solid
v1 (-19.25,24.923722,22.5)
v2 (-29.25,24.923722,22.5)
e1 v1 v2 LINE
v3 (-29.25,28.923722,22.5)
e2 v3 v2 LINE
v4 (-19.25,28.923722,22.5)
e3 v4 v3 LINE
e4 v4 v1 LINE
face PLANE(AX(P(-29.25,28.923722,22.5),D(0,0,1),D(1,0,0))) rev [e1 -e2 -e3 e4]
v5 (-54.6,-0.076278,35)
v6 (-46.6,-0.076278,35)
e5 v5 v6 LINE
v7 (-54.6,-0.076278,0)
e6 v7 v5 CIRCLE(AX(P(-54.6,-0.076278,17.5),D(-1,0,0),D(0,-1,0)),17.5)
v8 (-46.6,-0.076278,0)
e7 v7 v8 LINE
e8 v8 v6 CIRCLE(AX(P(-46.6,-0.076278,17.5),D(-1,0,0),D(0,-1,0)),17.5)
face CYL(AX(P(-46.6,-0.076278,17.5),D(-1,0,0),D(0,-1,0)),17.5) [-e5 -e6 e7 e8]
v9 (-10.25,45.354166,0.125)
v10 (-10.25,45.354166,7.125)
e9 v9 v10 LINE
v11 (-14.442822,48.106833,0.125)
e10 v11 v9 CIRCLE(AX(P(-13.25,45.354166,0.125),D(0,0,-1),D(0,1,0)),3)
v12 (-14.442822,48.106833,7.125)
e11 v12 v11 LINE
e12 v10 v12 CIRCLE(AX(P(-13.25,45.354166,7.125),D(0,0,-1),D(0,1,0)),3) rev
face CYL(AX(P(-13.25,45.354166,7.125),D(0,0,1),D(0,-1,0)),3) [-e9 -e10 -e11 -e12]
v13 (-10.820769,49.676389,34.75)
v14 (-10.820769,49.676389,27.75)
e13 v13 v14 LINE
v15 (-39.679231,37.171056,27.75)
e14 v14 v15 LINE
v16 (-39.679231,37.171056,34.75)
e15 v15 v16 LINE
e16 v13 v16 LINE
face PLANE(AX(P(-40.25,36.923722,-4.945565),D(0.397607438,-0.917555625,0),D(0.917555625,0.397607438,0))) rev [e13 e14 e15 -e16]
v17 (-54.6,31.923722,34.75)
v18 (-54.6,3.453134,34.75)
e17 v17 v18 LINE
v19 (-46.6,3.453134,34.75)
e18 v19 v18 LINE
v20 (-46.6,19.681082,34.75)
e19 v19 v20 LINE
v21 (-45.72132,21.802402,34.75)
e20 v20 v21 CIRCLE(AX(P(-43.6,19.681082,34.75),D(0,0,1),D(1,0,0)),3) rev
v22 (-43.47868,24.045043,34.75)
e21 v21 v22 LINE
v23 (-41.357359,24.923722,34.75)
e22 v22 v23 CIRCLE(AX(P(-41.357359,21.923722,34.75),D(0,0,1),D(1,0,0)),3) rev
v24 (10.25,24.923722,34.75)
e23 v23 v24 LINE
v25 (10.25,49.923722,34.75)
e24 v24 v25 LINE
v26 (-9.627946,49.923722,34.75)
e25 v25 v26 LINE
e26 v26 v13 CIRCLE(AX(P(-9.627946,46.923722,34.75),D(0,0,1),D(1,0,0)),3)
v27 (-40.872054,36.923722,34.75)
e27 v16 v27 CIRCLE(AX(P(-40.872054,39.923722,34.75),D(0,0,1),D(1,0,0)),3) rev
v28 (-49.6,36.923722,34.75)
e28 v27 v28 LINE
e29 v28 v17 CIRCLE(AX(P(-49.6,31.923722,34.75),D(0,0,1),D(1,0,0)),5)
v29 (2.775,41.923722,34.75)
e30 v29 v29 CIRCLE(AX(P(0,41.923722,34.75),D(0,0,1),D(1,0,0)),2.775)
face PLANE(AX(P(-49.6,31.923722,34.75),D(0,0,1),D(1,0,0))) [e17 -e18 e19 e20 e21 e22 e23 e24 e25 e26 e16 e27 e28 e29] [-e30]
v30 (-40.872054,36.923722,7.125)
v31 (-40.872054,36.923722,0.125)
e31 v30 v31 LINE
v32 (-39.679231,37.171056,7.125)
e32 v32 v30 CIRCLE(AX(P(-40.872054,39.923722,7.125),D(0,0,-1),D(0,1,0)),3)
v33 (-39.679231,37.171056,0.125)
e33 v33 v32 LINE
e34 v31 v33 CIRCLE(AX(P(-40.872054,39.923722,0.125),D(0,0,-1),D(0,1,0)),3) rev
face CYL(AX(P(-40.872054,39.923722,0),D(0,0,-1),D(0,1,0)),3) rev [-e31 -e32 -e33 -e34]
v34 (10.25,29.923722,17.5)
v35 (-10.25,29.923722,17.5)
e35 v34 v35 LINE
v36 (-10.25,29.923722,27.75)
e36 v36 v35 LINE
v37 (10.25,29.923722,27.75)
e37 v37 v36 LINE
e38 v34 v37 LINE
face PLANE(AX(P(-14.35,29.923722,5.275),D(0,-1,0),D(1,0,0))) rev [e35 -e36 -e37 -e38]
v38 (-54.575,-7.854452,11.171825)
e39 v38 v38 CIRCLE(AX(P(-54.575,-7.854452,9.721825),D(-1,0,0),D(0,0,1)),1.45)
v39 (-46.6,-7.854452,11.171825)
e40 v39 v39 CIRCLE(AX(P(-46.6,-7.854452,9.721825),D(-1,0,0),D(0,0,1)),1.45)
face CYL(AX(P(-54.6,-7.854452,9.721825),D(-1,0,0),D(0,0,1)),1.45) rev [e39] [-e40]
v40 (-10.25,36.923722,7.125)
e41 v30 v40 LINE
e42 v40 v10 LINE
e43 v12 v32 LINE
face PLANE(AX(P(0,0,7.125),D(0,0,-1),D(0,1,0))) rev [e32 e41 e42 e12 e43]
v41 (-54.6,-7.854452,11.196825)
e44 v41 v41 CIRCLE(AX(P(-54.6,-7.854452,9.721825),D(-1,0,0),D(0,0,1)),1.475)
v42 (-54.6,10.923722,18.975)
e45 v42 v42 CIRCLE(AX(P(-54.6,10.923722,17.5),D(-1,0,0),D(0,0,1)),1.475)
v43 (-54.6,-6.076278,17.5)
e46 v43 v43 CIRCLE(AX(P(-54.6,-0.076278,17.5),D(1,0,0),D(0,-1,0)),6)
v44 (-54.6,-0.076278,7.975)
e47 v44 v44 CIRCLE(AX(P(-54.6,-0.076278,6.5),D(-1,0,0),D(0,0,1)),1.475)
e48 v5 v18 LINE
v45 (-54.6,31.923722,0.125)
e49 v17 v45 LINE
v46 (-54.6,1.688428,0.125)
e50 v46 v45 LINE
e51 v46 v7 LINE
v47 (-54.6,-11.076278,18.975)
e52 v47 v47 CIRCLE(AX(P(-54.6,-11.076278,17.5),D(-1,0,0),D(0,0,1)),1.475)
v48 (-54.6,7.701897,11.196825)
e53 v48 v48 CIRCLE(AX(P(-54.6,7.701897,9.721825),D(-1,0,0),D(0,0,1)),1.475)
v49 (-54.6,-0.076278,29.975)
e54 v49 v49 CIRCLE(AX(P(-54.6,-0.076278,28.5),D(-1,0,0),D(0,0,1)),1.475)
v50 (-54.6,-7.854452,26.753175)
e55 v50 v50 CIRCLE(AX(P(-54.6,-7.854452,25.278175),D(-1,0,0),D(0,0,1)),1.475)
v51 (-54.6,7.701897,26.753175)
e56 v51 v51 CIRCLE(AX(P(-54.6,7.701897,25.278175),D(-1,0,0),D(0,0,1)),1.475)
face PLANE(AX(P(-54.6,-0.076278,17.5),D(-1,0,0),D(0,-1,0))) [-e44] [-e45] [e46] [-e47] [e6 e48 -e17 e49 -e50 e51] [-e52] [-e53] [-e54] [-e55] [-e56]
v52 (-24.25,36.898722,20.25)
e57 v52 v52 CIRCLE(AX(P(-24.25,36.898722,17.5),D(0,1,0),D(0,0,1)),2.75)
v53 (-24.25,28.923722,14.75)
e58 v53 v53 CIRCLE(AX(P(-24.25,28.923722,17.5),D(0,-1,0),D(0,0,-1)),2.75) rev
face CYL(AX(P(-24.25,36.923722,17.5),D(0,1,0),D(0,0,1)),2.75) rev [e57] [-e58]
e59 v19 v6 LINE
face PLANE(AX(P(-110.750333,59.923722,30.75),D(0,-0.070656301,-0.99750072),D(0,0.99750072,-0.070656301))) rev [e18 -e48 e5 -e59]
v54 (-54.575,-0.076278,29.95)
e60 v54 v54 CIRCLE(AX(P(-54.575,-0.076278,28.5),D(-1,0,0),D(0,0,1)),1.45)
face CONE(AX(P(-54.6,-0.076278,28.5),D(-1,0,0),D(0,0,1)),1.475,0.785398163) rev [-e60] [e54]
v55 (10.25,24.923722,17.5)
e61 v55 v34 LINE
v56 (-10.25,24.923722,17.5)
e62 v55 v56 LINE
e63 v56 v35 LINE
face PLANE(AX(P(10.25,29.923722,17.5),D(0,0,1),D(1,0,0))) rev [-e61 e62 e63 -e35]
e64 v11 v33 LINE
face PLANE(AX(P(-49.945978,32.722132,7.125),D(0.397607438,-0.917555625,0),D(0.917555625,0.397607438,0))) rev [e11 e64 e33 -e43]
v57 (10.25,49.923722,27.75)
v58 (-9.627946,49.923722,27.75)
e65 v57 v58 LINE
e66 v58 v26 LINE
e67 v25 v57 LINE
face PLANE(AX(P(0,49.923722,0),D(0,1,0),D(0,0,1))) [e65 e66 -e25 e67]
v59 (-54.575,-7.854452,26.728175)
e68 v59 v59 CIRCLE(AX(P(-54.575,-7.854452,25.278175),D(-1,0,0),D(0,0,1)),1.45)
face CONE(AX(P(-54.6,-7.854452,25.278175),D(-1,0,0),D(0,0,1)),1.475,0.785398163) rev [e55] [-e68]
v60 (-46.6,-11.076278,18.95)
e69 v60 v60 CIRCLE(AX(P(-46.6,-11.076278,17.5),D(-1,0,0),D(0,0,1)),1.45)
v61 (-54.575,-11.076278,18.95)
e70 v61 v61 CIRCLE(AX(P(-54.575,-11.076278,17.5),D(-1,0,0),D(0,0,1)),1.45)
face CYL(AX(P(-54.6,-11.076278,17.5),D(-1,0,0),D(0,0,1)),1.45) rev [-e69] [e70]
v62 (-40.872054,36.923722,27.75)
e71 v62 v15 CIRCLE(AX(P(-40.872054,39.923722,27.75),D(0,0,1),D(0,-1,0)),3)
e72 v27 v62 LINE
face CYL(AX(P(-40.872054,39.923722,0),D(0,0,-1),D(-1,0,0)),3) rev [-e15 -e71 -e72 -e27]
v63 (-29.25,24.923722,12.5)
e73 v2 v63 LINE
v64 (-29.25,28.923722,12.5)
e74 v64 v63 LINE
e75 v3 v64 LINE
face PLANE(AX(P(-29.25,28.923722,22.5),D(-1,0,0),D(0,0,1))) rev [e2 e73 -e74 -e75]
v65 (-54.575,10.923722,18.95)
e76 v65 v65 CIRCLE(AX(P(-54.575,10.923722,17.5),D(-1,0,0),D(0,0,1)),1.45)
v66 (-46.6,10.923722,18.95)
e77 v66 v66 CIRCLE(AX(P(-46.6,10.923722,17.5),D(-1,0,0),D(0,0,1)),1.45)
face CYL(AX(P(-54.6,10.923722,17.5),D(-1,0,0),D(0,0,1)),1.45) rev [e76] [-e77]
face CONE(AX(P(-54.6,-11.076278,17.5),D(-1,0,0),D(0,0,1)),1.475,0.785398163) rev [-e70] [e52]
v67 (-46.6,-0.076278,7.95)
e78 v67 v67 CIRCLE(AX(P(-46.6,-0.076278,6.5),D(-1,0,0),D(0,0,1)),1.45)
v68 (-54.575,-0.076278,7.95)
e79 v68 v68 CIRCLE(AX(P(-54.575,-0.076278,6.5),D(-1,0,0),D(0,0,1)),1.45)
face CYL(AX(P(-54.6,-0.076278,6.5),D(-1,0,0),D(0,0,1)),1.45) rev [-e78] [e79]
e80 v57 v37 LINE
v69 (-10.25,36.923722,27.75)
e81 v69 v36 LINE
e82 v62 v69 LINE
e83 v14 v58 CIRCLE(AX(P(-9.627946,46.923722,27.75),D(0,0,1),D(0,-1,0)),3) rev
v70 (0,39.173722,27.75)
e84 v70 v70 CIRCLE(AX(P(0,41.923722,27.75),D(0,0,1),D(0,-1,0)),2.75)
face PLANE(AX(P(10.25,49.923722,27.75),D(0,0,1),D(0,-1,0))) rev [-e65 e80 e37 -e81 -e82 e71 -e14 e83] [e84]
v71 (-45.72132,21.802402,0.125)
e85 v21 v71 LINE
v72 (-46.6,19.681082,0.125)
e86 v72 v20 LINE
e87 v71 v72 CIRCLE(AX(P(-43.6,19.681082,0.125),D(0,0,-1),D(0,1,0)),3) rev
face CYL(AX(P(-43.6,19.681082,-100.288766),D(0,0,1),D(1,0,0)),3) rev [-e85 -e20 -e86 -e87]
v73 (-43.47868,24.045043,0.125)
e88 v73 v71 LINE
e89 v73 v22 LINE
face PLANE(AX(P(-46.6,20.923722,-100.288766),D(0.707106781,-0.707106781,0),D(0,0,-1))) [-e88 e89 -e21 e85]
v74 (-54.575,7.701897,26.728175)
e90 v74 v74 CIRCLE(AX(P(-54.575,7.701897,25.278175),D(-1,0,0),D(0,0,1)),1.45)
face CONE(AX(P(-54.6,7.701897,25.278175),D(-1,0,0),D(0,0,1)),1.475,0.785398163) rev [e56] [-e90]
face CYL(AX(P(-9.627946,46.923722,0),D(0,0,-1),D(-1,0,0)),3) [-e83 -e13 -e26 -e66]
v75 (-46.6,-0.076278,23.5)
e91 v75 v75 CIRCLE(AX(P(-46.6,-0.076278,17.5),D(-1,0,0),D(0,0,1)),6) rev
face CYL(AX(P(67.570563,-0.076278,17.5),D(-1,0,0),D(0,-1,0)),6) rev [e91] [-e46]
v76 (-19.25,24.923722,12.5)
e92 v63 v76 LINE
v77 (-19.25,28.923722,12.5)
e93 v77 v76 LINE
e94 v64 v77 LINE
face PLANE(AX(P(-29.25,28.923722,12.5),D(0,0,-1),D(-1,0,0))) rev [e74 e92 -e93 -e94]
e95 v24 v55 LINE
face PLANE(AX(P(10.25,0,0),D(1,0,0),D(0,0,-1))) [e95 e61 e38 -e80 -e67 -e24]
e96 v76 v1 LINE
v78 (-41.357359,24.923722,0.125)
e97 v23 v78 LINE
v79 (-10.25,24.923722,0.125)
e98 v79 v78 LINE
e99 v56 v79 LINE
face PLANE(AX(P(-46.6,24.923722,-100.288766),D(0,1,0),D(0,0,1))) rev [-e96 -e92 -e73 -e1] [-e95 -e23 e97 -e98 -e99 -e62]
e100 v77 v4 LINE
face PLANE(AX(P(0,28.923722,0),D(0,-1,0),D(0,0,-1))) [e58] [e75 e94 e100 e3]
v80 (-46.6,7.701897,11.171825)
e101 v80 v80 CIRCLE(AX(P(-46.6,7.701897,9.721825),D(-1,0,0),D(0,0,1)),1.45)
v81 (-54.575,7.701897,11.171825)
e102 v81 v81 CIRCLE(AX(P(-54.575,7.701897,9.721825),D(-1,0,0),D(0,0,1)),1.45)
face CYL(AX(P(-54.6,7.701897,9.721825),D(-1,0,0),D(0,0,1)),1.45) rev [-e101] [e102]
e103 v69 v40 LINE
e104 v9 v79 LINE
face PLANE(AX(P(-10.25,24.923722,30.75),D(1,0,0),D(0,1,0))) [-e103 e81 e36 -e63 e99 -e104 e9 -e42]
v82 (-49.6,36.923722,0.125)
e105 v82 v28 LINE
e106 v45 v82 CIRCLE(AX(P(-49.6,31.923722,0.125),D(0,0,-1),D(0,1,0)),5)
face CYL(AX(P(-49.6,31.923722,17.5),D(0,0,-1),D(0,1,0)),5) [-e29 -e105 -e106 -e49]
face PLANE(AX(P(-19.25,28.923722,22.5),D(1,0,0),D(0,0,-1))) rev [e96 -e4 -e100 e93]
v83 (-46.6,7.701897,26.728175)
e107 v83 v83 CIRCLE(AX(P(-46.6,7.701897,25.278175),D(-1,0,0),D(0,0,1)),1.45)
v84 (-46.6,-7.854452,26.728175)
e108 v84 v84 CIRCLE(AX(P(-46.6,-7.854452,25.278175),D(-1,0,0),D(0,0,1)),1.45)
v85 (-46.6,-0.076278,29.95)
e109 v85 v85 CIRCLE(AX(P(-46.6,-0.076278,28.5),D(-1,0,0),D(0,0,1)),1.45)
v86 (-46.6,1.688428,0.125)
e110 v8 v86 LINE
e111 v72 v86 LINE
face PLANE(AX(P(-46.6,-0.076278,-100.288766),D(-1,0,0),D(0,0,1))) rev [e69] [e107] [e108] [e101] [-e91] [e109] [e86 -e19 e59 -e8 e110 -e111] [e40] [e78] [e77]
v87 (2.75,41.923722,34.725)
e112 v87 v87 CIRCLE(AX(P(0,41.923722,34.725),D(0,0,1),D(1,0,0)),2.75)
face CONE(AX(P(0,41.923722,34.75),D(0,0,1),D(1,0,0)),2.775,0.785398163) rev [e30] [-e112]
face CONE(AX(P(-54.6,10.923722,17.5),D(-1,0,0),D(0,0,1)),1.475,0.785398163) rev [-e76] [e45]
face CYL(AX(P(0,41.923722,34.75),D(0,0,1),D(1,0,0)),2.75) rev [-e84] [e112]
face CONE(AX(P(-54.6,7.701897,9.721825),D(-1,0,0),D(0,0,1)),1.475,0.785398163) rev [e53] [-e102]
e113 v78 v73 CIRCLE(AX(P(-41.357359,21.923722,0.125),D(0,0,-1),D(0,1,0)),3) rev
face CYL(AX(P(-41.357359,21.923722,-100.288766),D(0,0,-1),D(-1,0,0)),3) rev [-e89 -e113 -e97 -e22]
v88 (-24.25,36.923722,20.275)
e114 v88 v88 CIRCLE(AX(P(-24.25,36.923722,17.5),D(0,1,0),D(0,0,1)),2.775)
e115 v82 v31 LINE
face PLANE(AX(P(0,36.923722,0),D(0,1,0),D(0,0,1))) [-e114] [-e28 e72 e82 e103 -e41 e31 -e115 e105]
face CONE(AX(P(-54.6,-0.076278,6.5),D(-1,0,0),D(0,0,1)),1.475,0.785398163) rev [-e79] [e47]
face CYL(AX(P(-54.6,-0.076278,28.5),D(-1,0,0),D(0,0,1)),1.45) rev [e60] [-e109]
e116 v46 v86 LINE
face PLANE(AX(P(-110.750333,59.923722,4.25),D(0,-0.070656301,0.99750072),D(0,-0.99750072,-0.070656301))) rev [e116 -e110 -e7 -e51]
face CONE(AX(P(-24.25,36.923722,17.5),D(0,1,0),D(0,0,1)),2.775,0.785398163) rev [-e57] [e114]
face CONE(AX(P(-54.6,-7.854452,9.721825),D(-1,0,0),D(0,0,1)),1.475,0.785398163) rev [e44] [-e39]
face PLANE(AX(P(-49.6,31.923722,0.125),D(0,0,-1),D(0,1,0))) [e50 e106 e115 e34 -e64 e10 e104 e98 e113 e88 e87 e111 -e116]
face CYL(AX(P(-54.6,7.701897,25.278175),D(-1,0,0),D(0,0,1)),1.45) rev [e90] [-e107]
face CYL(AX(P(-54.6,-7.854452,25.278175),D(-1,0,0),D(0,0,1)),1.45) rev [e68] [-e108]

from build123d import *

# Parameters (mm, degrees)
EXTRUDE_1_DEPTH                = 35
SKETCH_6_R                     = 6
CUT_EXTRUDE_2_DEPTH            = 101.2
SKETCH_7_R                     = 5.75
EXTRUDE_3_DEPTH                = 101.2
CUT_EXTRUDE_3_REACH            = 87.885
SKETCH_16_W                    = 20.2
SKETCH_16_H                    = 20.2
CUT_EXTRUDE_5_DEPTH            = 30
SKETCH_15_W                    = 20.5
SKETCH_15_H                    = 35
CUT_EXTRUDE_6_DEPTH            = 4.25
SKETCH_17_W                    = 20.5
SKETCH_17_H                    = 35
CUT_EXTRUDE_7_DEPTH            = 4.25
CUT_EXTRUDE_8_REACH            = 124.708
CUT_EXTRUDE_9_DEPTH            = 36.25
CUT_EXTRUDE_10_DEPTH           = 36.25
CUT_EXTRUDE_12_DEPTH           = 86.884879429
CUT_EXTRUDE1_START             = -50.6
SKETCH1_W                      = 50
SKETCH1_H                      = 80
CUT_EXTRUDE1_DEPTH             = 50.6
M5_CLEARANCE_HOLE2_D           = 5.5
M5_CLEARANCE_HOLE2_CSINK_D     = 5.55
M5_CLEARANCE_HOLE2_CSINK_ANGLE = 90
CUT_EXTRUDE_START              = -50.6
SKETCH_26_W                    = 72.367521013
SKETCH_26_H                    = 30.268087809
CUT_EXTRUDE_13_DEPTH           = 50.6
SKETCH_27_W                    = 40.35
SKETCH_27_H                    = 30.75
EXTRUDE_4_DEPTH                = 7
EXTRUDE_START                  = 4
EXTRUDE_5_DEPTH                = 4
EXTRUDE_8_DEPTH                = 8
HOLE_WIZARD_M2_5_1_D           = 2.9
HOLE_WIZARD_M2_5_1_CSINK_D     = 2.95
HOLE_WIZARD_M2_5_1_CSINK_ANGLE = 90
FILLET_START                   = 1
FILLET_1_DEPTH                 = 33
SKETCH_31_W                    = 13.25
SKETCH_31_H                    = 5
EXTRUDE_6_DEPTH                = 10.25
SKETCH_32_W                    = 13.25
SKETCH_32_H                    = 5
CUT_EXTRUDE_14_DEPTH           = 10.25
SKETCH_33_W                    = 50.5
SKETCH_33_H                    = 3
EXTRUDE_7_DEPTH                = 20
CUT_EXTRUDE_15_DEPTH           = 3
HOLE_WIZARD_M5_2_D             = 5.5
HOLE_WIZARD_M5_2_CSINK_D       = 5.55
HOLE_WIZARD_M5_2_CSINK_ANGLE   = 90
EXTRUDE_10_DEPTH               = 4
HOLE_WIZARD_M5_1_D             = 5.5
HOLE_WIZARD_M5_1_CSINK_D       = 5.55
HOLE_WIZARD_M5_1_CSINK_ANGLE   = 90
SKETCH_39_W                    = 10
SKETCH_39_H                    = 10
CUT_EXTRUDE_17_DEPTH           = 4
CHAMFER_1_SIZE                 = 4
EXTRUDE_START_2                = 2
EXTRUDE_15_DEPTH               = 2
EXTRUDE_START_3                = 27.625
EXTRUDE_16_DEPTH               = 7
FILLET_8_R                     = 3


with BuildPart() as part:
    # 草图1 → 凸台-拉伸1 (new body)
    with BuildSketch(Plane.XY):
        Polygon((50.6, -0.076277531), (50.6, 29.923722469), (20, 59.923722469), (-20, 59.923722469), (-50.6, 29.923722469), (-50.6, -0.076277531), align=None)
    extrude(amount=EXTRUDE_1_DEPTH)

    # 草图6 → 切除-拉伸2 (cut)
    with BuildSketch(Plane.ZY.offset(50.6)):
        with Locations((17.5, -0.076277531)):
            Circle(SKETCH_6_R)
    extrude(amount=-CUT_EXTRUDE_2_DEPTH, mode=Mode.SUBTRACT)

    # 草图7 → 凸台-拉伸3 (add)
    with BuildSketch(Plane.ZY.offset(50.6)):
        with Locations((5.75, -0.076277531)):
            Circle(SKETCH_7_R)
        with Locations((29.25, -0.076277531)):
            Circle(SKETCH_7_R)
    extrude(amount=-EXTRUDE_3_DEPTH)

    # 切除-拉伸3: up to this face of the body (flat: up to its plane)
    cut_extrude_3_end = Plane(part.part.faces().sort_by_distance((0, 26.361440746, 0))[0])
    # 草图8 → 切除-拉伸3 (cut, up to the picked face)
    with BuildSketch(Plane.XY.offset(35), mode=Mode.PRIVATE) as cut_extrude_3_sk1:
        Polygon((-46.6, -0.076277531), (-46.6, 24.923722469), (46.6, 24.923722469), (46.6, -0.076277531), (46.6, -12.111349377), (-46.6, -12.111349377), align=None)
    cut_extrude_3_tool1 = split(extrude(cut_extrude_3_sk1.sketch, amount=-CUT_EXTRUDE_3_REACH, mode=Mode.PRIVATE), bisect_by=cut_extrude_3_end, keep=Keep.BOTH, mode=Mode.PRIVATE)
    add(cut_extrude_3_tool1.solids().sort_by(Axis((0, 6.406187, 35), (0, 0, -1)))[0], mode=Mode.SUBTRACT)

    # 草图16 → 切除-拉伸5 (cut)
    with BuildSketch(Plane(origin=(0, 59.923722469, 0), x_dir=(1, 0, 0), z_dir=(0, 1, 0))):
        with Locations((0, -17.5)):
            Rectangle(SKETCH_16_W, SKETCH_16_H)
    extrude(amount=-CUT_EXTRUDE_5_DEPTH, mode=Mode.SUBTRACT)

    # 草图15 → 切除-拉伸6 (cut)
    with BuildSketch(Plane.XY.offset(35)):
        with Locations((0, 42.423722469)):
            Rectangle(SKETCH_15_W, SKETCH_15_H)
    extrude(amount=-CUT_EXTRUDE_6_DEPTH, mode=Mode.SUBTRACT)

    # 草图17 → 切除-拉伸7 (cut)
    with BuildSketch(Plane(origin=(0, 0, 0), x_dir=(-1, 0, 0), z_dir=(0, 0, -1))):
        with Locations((0, 42.423722469)):
            Rectangle(SKETCH_17_W, SKETCH_17_H)
    extrude(amount=-CUT_EXTRUDE_7_DEPTH, mode=Mode.SUBTRACT)

    # 切除-拉伸8: up to this face of the body (flat: up to its plane)
    cut_extrude_8_end = Plane(part.part.faces().sort_by_distance((-50.6, 13.914643518, 17.5))[0])
    # 草图20 → 切除-拉伸8 (cut, up to the picked face)
    with BuildSketch(Plane(origin=(50.6, 0, 0), x_dir=(0, 0, -1), z_dir=(1, 0, 0)), mode=Mode.PRIVATE) as cut_extrude_8_sk1:
        Polygon((-30.75, 59.923722469), (-35, 59.923722469), (-35, -0.076277531), align=None)
    cut_extrude_8_tool1 = split(extrude(cut_extrude_8_sk1.sketch, amount=-CUT_EXTRUDE_8_REACH, mode=Mode.PRIVATE), bisect_by=cut_extrude_8_end, keep=Keep.BOTH, mode=Mode.PRIVATE)
    # 草图20 → 切除-拉伸8 (cut, up to the picked face)
    with BuildSketch(Plane(origin=(50.6, 0, 0), x_dir=(0, 0, -1), z_dir=(1, 0, 0)), mode=Mode.PRIVATE) as cut_extrude_8_sk2:
        Polygon((0, -0.076277531), (0, 59.923722469), (-4.25, 59.923722469), align=None)
    cut_extrude_8_tool2 = split(extrude(cut_extrude_8_sk2.sketch, amount=-CUT_EXTRUDE_8_REACH, mode=Mode.PRIVATE), bisect_by=cut_extrude_8_end, keep=Keep.BOTH, mode=Mode.PRIVATE)
    add(cut_extrude_8_tool1.solids().sort_by(Axis((50.6, 39.923722, 33.583333), (-1, 0, 0)))[0], mode=Mode.SUBTRACT)
    add(cut_extrude_8_tool2.solids().sort_by(Axis((50.6, 39.923722, 1.416667), (-1, 0, 0)))[0], mode=Mode.SUBTRACT)

    # 草图21 → 切除-拉伸9 (cut)
    with BuildSketch(Plane(origin=(50.6, 0, 0), x_dir=(0, 0, -1), z_dir=(1, 0, 0))):
        Polygon((-27.6, 59.923722469), (-29.725, 29.923722469), (-5.275, 29.923722469), (-7.4, 59.923722469), align=None)
    extrude(amount=-CUT_EXTRUDE_9_DEPTH, mode=Mode.SUBTRACT)

    # 草图22 → 切除-拉伸10 (cut)
    with BuildSketch(Plane.ZY.offset(50.6)):
        Polygon((29.725, 29.923722469), (27.6, 59.923722469), (7.4, 59.923722469), (5.275, 29.923722469), align=None)
    extrude(amount=-CUT_EXTRUDE_10_DEPTH, mode=Mode.SUBTRACT)

    # 草图25 → 切除-拉伸12 (cut, through all)
    with BuildSketch(Plane.XY):
        Polygon((38.35, 33.923722469), (18.35, 33.923722469), (18.35, 53.531565607), align=None)
        Polygon((-18.35, 53.531565607), (-38.35, 33.923722469), (-18.35, 33.923722469), align=None)
    extrude(amount=CUT_EXTRUDE_12_DEPTH, mode=Mode.SUBTRACT)

    # Sketch1 → Cut-Extrude1 (cut)
    with BuildSketch(Plane(origin=(50.6, 0, 0), x_dir=(0, 0, -1), z_dir=(1, 0, 0)).offset(CUT_EXTRUDE1_START)):
        with Locations((-17.5, 29.923722469)):
            Rectangle(SKETCH1_W, SKETCH1_H)
    extrude(amount=CUT_EXTRUDE1_DEPTH, mode=Mode.SUBTRACT)

    # M5 Clearance Hole2 (through all)
    with Locations(Plane.ZY.offset(14.35)):
        with Locations((17.5, 36.923722469), (17.5, 51.923722469)):
            CounterSinkHole(M5_CLEARANCE_HOLE2_D / 2, M5_CLEARANCE_HOLE2_CSINK_D / 2, counter_sink_angle=M5_CLEARANCE_HOLE2_CSINK_ANGLE)

    # 草图26 → 切除-拉伸13 (cut)
    with BuildSketch(Plane(origin=(0, 0, 0), x_dir=(0, 0, -1), z_dir=(1, 0, 0)).offset(CUT_EXTRUDE_START)):
        with Locations((-20.049143716, 45.057766374)):
            Rectangle(SKETCH_26_W, SKETCH_26_H)
    extrude(amount=CUT_EXTRUDE_13_DEPTH, mode=Mode.SUBTRACT)

    # 草图27 → 凸台-拉伸4 (add)
    with BuildSketch(Plane(origin=(0, 29.923722469, 0), x_dir=(1, 0, 0), z_dir=(0, 1, 0))):
        with Locations((-30.425, -17.5)):
            Rectangle(SKETCH_27_W, SKETCH_27_H)
    extrude(amount=EXTRUDE_4_DEPTH)

    # 草图28 → 凸台-拉伸5 (add)
    with BuildSketch(Plane.ZY.offset(50.6).offset(EXTRUDE_START)):
        with BuildLine():
            Line((35, -0.076277531), (32.875, 29.923722469))
            Line((32.875, 29.923722469), (32.875, 36.923722469))
            Line((32.875, 36.923722469), (2.125, 36.923722469))
            Line((2.125, 36.923722469), (2.125, 29.923722469))
            Line((2.125, 29.923722469), (0, -0.076277531))
            ThreePointArc((0, -0.076277531), (5.75, -5.826277531), (11.5, -0.076277531))
            ThreePointArc((11.5, -0.076277531), (17.5, 5.923722469), (23.5, -0.076277531))
            ThreePointArc((23.5, -0.076277531), (29.25, -5.826277531), (35, -0.076277531))
        make_face()
    extrude(amount=-EXTRUDE_5_DEPTH)

    # 草图36 → 凸台-拉伸8 (add)
    with BuildSketch(Plane.ZY.offset(54.6)):
        with BuildLine():
            ThreePointArc((11.5, -0.076277531), (17.5, -6.076277531), (23.5, -0.076277531))
            ThreePointArc((23.5, -0.076277531), (29.25, -5.826277531), (35, -0.076277531))
            ThreePointArc((35, -0.076277531), (17.5, -17.576277531), (0, -0.076277531))
            ThreePointArc((0, -0.076277531), (5.75, -5.826277531), (11.5, -0.076277531))
        make_face()
    extrude(amount=-EXTRUDE_8_DEPTH)

    # M2.5 间隙孔1 (through all)
    with Locations(Plane(origin=(-54.6, 0, 0), x_dir=(0, 0, -1), z_dir=(-1, 0, 0))):
        with Locations((-25.278174593, -7.701897062), (-17.5, -10.923722469), (-9.721825407, -7.701897062), (-6.5, 0.076277531), (-9.721825407, 7.854452124), (-17.5, 11.076277531), (-25.278174593, 7.854452124), (-28.5, 0.076277531)):
            CounterSinkHole(HOLE_WIZARD_M2_5_1_D / 2, HOLE_WIZARD_M2_5_1_CSINK_D / 2, counter_sink_angle=HOLE_WIZARD_M2_5_1_CSINK_ANGLE)

    # 圆角1: read off the stored shape, not the designer's step
    # 圆角1 outline → 圆角1 (cut)
    with BuildSketch(Plane.XY.offset(FILLET_START)):
        with BuildLine():
            Line((-54.6, 36.923722469), (-54.6, 31.923722469))
            ThreePointArc((-54.6, 31.923722469), (-53.135533906, 35.459256375), (-49.6, 36.923722469))
            Line((-49.6, 36.923722469), (-54.6, 36.923722469))
        make_face()
    extrude(amount=FILLET_1_DEPTH, mode=Mode.SUBTRACT)

    # 草图31 → 凸台-拉伸6 (add)
    with BuildSketch(Plane(origin=(0, 0, 0), x_dir=(0, 0, -1), z_dir=(1, 0, 0))):
        with Locations((-24.125, 27.423722469)):
            Rectangle(SKETCH_31_W, SKETCH_31_H)
    extrude(amount=EXTRUDE_6_DEPTH)

    # 草图32 → 切除-拉伸14 (cut)
    with BuildSketch(Plane(origin=(0, 0, 0), x_dir=(0, 0, -1), z_dir=(1, 0, 0))):
        with Locations((-10.875, 27.423722469)):
            Rectangle(SKETCH_32_W, SKETCH_32_H)
    extrude(amount=-CUT_EXTRUDE_14_DEPTH, mode=Mode.SUBTRACT)

    # 草图33 → 凸台-拉伸7 (add)
    with BuildSketch(Plane(origin=(0, 29.923722469, 0), x_dir=(1, 0, 0), z_dir=(0, 1, 0))):
        with Locations((-15, -29.25)):
            Rectangle(SKETCH_33_W, SKETCH_33_H)
    extrude(amount=EXTRUDE_7_DEPTH)

    # 草图34 → 切除-拉伸15 (cut)
    with BuildSketch(Plane.XY.offset(30.75)):
        Polygon((-40.25, 36.923722469), (-10.25, 49.923722469), (-40.25, 49.923722469), align=None)
    extrude(amount=-CUT_EXTRUDE_15_DEPTH, mode=Mode.SUBTRACT)

    # M5 间隙孔2 (through all)
    with Locations(Plane(origin=(0, 36.923722469, 0), x_dir=(1, 0, 0), z_dir=(0, 1, 0))):
        with Locations((-24.25, -17.5)):
            CounterSinkHole(HOLE_WIZARD_M5_2_D / 2, HOLE_WIZARD_M5_2_CSINK_D / 2, counter_sink_angle=HOLE_WIZARD_M5_2_CSINK_ANGLE)

    # 草图43 → 凸台-拉伸10 (add)
    with BuildSketch(Plane.XY.offset(30.75)):
        with BuildLine():
            Line((-49.6, 36.923722469), (-40.25, 36.923722469))
            Line((-40.25, 36.923722469), (-10.25, 49.923722469))
            Line((-10.25, 49.923722469), (10.25, 49.923722469))
            Line((10.25, 49.923722469), (10.25, 24.923722469))
            Line((10.25, 24.923722469), (-10.25, 24.923722469))
            Line((-10.25, 24.923722469), (-46.6, 24.923722469))
            Line((-46.6, 24.923722469), (-46.6, -0.076277531))
            Line((-46.6, -0.076277531), (-54.6, -0.076277531))
            Line((-54.6, -0.076277531), (-54.6, 29.923722469))
            Line((-54.6, 29.923722469), (-54.6, 31.923722469))
            ThreePointArc((-54.6, 31.923722469), (-53.135533906, 35.459256375), (-49.6, 36.923722469))
        make_face()
    extrude(amount=EXTRUDE_10_DEPTH)

    # M5 间隙孔1 (through all)
    with Locations(Plane.XY.offset(34.75)):
        with Locations((0, 41.923722469)):
            CounterSinkHole(HOLE_WIZARD_M5_1_D / 2, HOLE_WIZARD_M5_1_CSINK_D / 2, counter_sink_angle=HOLE_WIZARD_M5_1_CSINK_ANGLE)

    # 草图39 → 切除-拉伸17 (cut)
    with BuildSketch(Plane.XZ.offset(-24.923722469)):
        with Locations((-24.25, 17.5)):
            Rectangle(SKETCH_39_W, SKETCH_39_H)
    extrude(amount=-CUT_EXTRUDE_17_DEPTH, mode=Mode.SUBTRACT)

    # 倒角1
    chamfer_1_edges = [part.edges().sort_by_distance(p)[0] for p in [
        (-46.6, 24.923722469, 18.260416667),
    ]]
    chamfer(chamfer_1_edges, length=CHAMFER_1_SIZE)

    # 草图46 → 凸台-拉伸15 (add)
    with BuildSketch(Plane(origin=(0, -0.075356889, 2.125), x_dir=(-1, 0, 0), z_dir=(0, 0, -1)).offset(EXTRUDE_START_2)):
        with BuildLine():
            Line((54.6, 29.999079359), (54.6, 31.999079359))
            ThreePointArc((54.6, 31.999079359), (53.135533906, 35.534613265), (49.6, 36.999079359))
            Line((49.6, 36.999079359), (10.25, 36.999079359))
            Line((10.25, 36.999079359), (10.25, 29.999079359))
            Line((10.25, 29.999079359), (10.25, 24.999079359))
            Line((10.25, 24.999079359), (42.6, 24.999079359))
            Line((42.6, 24.999079359), (46.6, 20.999079359))
            Line((46.6, 20.999079359), (46.6, -0.000920641))
            Line((46.6, -0.000920641), (54.6, -0.000920641))
            Line((54.6, -0.000920641), (54.6, 29.999079359))
        make_face()
    extrude(amount=-EXTRUDE_15_DEPTH)

    # 草图45 → 凸台-拉伸16 (add)
    with BuildSketch(Plane(origin=(0, 0, 27.75), x_dir=(-1, 0, 0), z_dir=(0, 0, -1)).offset(EXTRUDE_START_3)):
        Polygon((10.25, 49.923722469), (10.25, 36.923722469), (40.25, 36.923722469), align=None)
    extrude(amount=-EXTRUDE_16_DEPTH)

    # 圆角8
    fillet_8_edges = [part.edges().sort_by_distance(p)[0] for p in [
        (-40.25, 36.923722469, 31.25),
        (-10.25, 49.923722469, 31.25),
        (-46.6, 20.923722469, 17.4375),
        (-42.6, 24.923722469, 17.4375),
        (-10.25, 49.923722469, 3.625),
        (-40.25, 36.923722469, 3.625),
    ]]
    fillet(fillet_8_edges, radius=FILLET_8_R)


solid = part.part
